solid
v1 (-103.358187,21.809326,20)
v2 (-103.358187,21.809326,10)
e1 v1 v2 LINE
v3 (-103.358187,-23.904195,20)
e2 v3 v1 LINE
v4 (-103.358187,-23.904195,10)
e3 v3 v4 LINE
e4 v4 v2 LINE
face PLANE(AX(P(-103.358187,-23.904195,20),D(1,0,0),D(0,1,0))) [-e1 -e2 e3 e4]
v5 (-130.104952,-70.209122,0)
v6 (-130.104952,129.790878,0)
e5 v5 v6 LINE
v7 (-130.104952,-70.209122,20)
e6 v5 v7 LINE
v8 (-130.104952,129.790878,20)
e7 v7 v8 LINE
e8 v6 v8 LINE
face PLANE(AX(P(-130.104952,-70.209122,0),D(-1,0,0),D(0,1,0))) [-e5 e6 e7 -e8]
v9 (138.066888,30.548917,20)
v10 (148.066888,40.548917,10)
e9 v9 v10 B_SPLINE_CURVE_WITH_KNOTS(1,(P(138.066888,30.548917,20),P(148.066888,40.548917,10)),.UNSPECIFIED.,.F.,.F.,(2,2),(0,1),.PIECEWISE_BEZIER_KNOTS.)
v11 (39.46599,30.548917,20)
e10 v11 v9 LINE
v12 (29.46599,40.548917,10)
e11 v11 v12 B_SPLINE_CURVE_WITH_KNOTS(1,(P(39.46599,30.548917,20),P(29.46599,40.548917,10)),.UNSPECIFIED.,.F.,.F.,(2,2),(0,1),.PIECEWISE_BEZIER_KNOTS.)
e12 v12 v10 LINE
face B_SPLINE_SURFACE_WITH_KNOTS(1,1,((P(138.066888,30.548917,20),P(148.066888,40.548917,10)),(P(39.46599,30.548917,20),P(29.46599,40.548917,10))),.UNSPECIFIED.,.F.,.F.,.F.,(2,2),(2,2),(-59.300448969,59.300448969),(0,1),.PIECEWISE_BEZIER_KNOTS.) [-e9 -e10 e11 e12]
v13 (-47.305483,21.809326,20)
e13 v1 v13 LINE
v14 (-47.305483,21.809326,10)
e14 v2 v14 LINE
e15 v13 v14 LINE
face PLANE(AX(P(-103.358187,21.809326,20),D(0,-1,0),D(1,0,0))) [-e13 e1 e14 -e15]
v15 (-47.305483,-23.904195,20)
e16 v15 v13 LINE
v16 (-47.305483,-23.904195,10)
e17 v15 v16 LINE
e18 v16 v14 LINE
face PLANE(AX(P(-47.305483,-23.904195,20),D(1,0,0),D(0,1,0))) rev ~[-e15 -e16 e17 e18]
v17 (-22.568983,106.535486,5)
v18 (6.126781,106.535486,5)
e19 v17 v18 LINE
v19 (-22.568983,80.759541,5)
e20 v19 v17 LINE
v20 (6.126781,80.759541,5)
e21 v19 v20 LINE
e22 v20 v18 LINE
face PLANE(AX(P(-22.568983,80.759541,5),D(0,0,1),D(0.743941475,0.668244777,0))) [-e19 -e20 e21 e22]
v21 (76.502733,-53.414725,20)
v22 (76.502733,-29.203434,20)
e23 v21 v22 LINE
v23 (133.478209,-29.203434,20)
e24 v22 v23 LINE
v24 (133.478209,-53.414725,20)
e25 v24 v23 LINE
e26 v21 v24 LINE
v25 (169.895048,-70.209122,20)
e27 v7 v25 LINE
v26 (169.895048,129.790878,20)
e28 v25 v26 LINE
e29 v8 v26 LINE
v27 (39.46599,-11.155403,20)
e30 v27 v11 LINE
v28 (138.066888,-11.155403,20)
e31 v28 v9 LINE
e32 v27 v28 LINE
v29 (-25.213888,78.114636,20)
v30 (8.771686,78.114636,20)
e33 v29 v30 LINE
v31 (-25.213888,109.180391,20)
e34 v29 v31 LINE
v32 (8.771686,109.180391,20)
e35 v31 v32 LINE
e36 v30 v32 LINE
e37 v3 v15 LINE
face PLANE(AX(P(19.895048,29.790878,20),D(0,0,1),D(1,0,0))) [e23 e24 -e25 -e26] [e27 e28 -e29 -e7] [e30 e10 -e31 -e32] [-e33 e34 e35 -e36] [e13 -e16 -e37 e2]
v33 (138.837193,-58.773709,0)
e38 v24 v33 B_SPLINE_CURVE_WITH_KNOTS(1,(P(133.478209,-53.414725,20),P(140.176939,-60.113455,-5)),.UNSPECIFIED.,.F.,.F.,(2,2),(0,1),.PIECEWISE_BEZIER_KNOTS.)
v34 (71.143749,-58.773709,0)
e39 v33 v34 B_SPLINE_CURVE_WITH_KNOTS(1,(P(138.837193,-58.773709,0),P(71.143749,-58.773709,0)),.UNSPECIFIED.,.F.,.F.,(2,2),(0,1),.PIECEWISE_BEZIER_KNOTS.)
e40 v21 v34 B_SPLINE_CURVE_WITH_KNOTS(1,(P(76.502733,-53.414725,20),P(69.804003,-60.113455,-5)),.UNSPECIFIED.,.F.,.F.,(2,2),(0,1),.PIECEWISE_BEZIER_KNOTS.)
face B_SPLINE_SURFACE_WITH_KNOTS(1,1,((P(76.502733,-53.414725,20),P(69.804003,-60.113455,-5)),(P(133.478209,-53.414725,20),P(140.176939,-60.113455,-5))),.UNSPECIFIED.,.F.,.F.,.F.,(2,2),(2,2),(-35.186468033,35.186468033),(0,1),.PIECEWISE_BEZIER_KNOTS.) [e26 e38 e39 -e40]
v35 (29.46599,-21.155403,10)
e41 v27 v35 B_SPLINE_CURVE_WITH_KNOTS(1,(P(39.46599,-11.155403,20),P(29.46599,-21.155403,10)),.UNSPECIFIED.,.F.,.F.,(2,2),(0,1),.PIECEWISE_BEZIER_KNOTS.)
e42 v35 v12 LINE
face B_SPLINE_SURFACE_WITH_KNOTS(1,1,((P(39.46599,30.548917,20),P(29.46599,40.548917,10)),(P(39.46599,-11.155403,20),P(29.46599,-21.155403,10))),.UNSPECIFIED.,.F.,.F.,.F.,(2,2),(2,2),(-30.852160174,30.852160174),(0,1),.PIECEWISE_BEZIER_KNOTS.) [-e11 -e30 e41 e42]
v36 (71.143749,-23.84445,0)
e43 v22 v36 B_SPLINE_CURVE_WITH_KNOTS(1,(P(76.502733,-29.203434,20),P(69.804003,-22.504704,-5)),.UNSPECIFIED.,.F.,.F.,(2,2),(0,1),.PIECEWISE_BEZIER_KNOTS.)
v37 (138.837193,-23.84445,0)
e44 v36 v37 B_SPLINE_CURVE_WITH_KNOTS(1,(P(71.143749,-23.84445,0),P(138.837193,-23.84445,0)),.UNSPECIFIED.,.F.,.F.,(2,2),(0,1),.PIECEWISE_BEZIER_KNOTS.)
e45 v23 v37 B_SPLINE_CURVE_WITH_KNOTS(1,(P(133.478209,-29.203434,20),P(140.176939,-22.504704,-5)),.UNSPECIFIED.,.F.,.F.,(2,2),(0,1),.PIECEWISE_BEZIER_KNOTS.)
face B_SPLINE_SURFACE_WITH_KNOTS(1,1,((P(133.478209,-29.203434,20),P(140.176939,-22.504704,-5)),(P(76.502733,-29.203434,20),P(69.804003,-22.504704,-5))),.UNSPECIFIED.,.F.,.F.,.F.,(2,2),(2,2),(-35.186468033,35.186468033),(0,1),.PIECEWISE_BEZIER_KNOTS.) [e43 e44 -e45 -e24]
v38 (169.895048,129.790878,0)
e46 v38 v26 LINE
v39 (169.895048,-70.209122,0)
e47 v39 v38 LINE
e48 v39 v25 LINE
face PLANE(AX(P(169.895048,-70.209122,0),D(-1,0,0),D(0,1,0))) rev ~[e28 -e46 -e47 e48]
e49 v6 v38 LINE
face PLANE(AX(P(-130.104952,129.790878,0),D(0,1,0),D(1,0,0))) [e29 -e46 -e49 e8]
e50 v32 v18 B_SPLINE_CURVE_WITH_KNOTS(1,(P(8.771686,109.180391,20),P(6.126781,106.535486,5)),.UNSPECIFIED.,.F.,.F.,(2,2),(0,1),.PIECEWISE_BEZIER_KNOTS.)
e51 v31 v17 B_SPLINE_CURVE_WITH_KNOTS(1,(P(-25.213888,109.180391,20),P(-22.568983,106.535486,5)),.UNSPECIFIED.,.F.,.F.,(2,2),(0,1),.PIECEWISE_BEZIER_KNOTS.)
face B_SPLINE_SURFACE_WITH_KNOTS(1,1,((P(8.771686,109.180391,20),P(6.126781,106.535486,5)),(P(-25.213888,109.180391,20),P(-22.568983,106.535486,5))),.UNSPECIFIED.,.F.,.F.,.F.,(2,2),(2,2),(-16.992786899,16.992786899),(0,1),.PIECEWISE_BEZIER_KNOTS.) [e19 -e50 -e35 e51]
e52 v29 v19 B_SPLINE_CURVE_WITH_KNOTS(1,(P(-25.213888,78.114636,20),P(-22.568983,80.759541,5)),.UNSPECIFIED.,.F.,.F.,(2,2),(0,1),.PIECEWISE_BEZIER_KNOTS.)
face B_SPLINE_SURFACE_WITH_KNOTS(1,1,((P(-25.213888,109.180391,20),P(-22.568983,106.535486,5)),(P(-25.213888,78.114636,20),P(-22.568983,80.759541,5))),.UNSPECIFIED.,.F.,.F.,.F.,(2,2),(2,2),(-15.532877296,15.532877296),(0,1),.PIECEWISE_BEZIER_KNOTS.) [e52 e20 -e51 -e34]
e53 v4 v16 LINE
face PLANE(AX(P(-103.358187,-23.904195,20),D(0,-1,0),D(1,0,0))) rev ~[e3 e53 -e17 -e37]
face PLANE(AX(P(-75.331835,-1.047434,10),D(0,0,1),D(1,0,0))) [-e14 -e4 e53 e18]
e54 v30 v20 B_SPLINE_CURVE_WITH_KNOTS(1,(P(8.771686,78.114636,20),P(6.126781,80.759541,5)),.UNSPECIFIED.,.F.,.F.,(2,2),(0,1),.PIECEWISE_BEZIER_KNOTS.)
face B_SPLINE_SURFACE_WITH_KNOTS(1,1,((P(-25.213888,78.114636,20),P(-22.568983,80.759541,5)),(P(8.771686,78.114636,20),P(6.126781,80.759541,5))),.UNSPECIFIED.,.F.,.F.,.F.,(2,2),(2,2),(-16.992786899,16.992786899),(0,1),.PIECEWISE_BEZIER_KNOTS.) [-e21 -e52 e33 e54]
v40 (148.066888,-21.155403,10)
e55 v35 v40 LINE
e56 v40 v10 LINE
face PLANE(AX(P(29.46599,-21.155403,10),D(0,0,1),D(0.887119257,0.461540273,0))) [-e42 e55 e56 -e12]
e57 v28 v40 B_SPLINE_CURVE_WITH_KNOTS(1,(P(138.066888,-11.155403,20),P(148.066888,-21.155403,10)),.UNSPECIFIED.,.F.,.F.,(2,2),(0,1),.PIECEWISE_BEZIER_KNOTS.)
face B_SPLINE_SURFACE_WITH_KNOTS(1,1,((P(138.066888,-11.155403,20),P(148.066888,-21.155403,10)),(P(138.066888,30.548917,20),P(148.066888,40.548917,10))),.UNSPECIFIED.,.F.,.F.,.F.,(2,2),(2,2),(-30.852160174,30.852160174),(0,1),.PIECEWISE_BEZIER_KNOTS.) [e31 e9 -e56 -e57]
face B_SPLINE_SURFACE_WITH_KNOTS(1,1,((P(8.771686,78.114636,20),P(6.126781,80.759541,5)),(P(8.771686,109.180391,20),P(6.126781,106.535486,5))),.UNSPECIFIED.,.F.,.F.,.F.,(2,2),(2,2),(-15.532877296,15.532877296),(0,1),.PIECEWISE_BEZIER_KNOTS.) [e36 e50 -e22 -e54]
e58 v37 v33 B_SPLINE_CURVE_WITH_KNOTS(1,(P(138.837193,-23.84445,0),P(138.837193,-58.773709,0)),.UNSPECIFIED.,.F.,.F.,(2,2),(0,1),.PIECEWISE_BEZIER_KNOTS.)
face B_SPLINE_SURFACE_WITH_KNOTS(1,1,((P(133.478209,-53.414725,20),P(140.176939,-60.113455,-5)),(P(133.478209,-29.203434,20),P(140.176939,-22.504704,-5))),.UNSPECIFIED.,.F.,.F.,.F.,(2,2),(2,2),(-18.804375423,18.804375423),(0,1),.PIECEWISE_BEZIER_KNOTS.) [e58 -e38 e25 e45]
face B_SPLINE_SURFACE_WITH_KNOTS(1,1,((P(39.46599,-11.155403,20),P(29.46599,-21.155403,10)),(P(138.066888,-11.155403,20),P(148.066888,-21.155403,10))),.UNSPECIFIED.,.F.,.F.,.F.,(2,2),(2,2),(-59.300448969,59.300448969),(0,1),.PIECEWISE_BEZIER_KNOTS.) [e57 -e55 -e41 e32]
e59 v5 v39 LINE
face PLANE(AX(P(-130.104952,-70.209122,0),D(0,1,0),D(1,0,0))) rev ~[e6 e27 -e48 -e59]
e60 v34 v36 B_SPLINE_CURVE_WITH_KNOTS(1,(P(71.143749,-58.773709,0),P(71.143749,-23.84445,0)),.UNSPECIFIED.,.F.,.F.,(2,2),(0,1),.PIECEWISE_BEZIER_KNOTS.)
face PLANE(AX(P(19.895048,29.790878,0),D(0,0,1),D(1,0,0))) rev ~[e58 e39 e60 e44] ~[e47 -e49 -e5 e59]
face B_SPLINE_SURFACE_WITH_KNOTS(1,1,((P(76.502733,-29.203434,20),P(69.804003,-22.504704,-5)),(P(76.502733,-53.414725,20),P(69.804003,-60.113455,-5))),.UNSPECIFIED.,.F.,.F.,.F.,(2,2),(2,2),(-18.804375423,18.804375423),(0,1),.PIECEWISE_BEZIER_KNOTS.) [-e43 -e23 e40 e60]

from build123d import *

# Parameters (mm, degrees)
F0_W      = 300
F0_H      = 200
F1_DEPTH  = 20
F2_W      = 56.0527034104
F2_H      = 45.7135215402
F3_DEPTH  = 10
F4_W      = 66.9058933854
F4_H      = 34.0227484703
F5_DEPTH  = 10
F6_W      = 98.600897938
F6_H      = 41.7043203488
F7_DEPTH  = 10
F7_TAPER  = -45
F8_W      = 32.641120255
F8_H      = 31.1660170555
F9_DEPTH  = 10
F9_TAPER  = -20
F10_W     = 33.9855737984
F10_H     = 31.0657545924
F11_DEPTH = 15
F11_TAPER = 10
F12_W     = 56.9754764438
F12_H     = 24.2112912238
F13_DEPTH = 25
F13_TAPER = -15


with BuildPart() as f1:
    # F0 (on Top) → F1 (new body)
    with BuildSketch(Plane.XY):
        with Locations((19.8950484647, 29.7908782959)):
            Rectangle(F0_W, F0_H)
    extrude(amount=F1_DEPTH)

    # F2 (on face) → F3 (cut)
    with BuildSketch(Plane.XY.offset(20)):
        with Locations((-75.3318350762, -1.0474342853)):
            Rectangle(F2_W, F2_H)
    extrude(amount=-F3_DEPTH, mode=Mode.SUBTRACT)

    # F4 (on face) → F5 (join)
    with BuildSketch(Plane.XY.offset(20)):
        with Locations((92.6642976701, 79.7481462359)):
            Rectangle(F4_W, F4_H)
    extrude(amount=-F5_DEPTH)

    # F6 (on face) → F7 (cut)
    with BuildSketch(Plane.XY.offset(20)):
        with Locations((88.7664388865, 9.6967569552)):
            Rectangle(F6_W, F6_H)
    extrude(amount=-F7_DEPTH, taper=F7_TAPER, mode=Mode.SUBTRACT)

    # F8 (on face) → F9 (join)
    with BuildSketch(Plane.XY.offset(20)):
        with Locations((-97.8116877377, 101.3978421688)):
            Rectangle(F8_W, F8_H)
    extrude(amount=-F9_DEPTH, taper=F9_TAPER)

    # F10 (on face) → F11 (cut)
    with BuildSketch(Plane.XY.offset(20)):
        with Locations((-8.2211010158, 93.6475135386)):
            Rectangle(F10_W, F10_H)
    extrude(amount=-F11_DEPTH, taper=F11_TAPER, mode=Mode.SUBTRACT)

    # F12 (on face) → F13 (cut)
    with BuildSketch(Plane.XY.offset(20)):
        with Locations((104.9904711545, -41.3090791553)):
            Rectangle(F12_W, F12_H)
    extrude(amount=-F13_DEPTH, taper=F13_TAPER, mode=Mode.SUBTRACT)


solid = f1.part
